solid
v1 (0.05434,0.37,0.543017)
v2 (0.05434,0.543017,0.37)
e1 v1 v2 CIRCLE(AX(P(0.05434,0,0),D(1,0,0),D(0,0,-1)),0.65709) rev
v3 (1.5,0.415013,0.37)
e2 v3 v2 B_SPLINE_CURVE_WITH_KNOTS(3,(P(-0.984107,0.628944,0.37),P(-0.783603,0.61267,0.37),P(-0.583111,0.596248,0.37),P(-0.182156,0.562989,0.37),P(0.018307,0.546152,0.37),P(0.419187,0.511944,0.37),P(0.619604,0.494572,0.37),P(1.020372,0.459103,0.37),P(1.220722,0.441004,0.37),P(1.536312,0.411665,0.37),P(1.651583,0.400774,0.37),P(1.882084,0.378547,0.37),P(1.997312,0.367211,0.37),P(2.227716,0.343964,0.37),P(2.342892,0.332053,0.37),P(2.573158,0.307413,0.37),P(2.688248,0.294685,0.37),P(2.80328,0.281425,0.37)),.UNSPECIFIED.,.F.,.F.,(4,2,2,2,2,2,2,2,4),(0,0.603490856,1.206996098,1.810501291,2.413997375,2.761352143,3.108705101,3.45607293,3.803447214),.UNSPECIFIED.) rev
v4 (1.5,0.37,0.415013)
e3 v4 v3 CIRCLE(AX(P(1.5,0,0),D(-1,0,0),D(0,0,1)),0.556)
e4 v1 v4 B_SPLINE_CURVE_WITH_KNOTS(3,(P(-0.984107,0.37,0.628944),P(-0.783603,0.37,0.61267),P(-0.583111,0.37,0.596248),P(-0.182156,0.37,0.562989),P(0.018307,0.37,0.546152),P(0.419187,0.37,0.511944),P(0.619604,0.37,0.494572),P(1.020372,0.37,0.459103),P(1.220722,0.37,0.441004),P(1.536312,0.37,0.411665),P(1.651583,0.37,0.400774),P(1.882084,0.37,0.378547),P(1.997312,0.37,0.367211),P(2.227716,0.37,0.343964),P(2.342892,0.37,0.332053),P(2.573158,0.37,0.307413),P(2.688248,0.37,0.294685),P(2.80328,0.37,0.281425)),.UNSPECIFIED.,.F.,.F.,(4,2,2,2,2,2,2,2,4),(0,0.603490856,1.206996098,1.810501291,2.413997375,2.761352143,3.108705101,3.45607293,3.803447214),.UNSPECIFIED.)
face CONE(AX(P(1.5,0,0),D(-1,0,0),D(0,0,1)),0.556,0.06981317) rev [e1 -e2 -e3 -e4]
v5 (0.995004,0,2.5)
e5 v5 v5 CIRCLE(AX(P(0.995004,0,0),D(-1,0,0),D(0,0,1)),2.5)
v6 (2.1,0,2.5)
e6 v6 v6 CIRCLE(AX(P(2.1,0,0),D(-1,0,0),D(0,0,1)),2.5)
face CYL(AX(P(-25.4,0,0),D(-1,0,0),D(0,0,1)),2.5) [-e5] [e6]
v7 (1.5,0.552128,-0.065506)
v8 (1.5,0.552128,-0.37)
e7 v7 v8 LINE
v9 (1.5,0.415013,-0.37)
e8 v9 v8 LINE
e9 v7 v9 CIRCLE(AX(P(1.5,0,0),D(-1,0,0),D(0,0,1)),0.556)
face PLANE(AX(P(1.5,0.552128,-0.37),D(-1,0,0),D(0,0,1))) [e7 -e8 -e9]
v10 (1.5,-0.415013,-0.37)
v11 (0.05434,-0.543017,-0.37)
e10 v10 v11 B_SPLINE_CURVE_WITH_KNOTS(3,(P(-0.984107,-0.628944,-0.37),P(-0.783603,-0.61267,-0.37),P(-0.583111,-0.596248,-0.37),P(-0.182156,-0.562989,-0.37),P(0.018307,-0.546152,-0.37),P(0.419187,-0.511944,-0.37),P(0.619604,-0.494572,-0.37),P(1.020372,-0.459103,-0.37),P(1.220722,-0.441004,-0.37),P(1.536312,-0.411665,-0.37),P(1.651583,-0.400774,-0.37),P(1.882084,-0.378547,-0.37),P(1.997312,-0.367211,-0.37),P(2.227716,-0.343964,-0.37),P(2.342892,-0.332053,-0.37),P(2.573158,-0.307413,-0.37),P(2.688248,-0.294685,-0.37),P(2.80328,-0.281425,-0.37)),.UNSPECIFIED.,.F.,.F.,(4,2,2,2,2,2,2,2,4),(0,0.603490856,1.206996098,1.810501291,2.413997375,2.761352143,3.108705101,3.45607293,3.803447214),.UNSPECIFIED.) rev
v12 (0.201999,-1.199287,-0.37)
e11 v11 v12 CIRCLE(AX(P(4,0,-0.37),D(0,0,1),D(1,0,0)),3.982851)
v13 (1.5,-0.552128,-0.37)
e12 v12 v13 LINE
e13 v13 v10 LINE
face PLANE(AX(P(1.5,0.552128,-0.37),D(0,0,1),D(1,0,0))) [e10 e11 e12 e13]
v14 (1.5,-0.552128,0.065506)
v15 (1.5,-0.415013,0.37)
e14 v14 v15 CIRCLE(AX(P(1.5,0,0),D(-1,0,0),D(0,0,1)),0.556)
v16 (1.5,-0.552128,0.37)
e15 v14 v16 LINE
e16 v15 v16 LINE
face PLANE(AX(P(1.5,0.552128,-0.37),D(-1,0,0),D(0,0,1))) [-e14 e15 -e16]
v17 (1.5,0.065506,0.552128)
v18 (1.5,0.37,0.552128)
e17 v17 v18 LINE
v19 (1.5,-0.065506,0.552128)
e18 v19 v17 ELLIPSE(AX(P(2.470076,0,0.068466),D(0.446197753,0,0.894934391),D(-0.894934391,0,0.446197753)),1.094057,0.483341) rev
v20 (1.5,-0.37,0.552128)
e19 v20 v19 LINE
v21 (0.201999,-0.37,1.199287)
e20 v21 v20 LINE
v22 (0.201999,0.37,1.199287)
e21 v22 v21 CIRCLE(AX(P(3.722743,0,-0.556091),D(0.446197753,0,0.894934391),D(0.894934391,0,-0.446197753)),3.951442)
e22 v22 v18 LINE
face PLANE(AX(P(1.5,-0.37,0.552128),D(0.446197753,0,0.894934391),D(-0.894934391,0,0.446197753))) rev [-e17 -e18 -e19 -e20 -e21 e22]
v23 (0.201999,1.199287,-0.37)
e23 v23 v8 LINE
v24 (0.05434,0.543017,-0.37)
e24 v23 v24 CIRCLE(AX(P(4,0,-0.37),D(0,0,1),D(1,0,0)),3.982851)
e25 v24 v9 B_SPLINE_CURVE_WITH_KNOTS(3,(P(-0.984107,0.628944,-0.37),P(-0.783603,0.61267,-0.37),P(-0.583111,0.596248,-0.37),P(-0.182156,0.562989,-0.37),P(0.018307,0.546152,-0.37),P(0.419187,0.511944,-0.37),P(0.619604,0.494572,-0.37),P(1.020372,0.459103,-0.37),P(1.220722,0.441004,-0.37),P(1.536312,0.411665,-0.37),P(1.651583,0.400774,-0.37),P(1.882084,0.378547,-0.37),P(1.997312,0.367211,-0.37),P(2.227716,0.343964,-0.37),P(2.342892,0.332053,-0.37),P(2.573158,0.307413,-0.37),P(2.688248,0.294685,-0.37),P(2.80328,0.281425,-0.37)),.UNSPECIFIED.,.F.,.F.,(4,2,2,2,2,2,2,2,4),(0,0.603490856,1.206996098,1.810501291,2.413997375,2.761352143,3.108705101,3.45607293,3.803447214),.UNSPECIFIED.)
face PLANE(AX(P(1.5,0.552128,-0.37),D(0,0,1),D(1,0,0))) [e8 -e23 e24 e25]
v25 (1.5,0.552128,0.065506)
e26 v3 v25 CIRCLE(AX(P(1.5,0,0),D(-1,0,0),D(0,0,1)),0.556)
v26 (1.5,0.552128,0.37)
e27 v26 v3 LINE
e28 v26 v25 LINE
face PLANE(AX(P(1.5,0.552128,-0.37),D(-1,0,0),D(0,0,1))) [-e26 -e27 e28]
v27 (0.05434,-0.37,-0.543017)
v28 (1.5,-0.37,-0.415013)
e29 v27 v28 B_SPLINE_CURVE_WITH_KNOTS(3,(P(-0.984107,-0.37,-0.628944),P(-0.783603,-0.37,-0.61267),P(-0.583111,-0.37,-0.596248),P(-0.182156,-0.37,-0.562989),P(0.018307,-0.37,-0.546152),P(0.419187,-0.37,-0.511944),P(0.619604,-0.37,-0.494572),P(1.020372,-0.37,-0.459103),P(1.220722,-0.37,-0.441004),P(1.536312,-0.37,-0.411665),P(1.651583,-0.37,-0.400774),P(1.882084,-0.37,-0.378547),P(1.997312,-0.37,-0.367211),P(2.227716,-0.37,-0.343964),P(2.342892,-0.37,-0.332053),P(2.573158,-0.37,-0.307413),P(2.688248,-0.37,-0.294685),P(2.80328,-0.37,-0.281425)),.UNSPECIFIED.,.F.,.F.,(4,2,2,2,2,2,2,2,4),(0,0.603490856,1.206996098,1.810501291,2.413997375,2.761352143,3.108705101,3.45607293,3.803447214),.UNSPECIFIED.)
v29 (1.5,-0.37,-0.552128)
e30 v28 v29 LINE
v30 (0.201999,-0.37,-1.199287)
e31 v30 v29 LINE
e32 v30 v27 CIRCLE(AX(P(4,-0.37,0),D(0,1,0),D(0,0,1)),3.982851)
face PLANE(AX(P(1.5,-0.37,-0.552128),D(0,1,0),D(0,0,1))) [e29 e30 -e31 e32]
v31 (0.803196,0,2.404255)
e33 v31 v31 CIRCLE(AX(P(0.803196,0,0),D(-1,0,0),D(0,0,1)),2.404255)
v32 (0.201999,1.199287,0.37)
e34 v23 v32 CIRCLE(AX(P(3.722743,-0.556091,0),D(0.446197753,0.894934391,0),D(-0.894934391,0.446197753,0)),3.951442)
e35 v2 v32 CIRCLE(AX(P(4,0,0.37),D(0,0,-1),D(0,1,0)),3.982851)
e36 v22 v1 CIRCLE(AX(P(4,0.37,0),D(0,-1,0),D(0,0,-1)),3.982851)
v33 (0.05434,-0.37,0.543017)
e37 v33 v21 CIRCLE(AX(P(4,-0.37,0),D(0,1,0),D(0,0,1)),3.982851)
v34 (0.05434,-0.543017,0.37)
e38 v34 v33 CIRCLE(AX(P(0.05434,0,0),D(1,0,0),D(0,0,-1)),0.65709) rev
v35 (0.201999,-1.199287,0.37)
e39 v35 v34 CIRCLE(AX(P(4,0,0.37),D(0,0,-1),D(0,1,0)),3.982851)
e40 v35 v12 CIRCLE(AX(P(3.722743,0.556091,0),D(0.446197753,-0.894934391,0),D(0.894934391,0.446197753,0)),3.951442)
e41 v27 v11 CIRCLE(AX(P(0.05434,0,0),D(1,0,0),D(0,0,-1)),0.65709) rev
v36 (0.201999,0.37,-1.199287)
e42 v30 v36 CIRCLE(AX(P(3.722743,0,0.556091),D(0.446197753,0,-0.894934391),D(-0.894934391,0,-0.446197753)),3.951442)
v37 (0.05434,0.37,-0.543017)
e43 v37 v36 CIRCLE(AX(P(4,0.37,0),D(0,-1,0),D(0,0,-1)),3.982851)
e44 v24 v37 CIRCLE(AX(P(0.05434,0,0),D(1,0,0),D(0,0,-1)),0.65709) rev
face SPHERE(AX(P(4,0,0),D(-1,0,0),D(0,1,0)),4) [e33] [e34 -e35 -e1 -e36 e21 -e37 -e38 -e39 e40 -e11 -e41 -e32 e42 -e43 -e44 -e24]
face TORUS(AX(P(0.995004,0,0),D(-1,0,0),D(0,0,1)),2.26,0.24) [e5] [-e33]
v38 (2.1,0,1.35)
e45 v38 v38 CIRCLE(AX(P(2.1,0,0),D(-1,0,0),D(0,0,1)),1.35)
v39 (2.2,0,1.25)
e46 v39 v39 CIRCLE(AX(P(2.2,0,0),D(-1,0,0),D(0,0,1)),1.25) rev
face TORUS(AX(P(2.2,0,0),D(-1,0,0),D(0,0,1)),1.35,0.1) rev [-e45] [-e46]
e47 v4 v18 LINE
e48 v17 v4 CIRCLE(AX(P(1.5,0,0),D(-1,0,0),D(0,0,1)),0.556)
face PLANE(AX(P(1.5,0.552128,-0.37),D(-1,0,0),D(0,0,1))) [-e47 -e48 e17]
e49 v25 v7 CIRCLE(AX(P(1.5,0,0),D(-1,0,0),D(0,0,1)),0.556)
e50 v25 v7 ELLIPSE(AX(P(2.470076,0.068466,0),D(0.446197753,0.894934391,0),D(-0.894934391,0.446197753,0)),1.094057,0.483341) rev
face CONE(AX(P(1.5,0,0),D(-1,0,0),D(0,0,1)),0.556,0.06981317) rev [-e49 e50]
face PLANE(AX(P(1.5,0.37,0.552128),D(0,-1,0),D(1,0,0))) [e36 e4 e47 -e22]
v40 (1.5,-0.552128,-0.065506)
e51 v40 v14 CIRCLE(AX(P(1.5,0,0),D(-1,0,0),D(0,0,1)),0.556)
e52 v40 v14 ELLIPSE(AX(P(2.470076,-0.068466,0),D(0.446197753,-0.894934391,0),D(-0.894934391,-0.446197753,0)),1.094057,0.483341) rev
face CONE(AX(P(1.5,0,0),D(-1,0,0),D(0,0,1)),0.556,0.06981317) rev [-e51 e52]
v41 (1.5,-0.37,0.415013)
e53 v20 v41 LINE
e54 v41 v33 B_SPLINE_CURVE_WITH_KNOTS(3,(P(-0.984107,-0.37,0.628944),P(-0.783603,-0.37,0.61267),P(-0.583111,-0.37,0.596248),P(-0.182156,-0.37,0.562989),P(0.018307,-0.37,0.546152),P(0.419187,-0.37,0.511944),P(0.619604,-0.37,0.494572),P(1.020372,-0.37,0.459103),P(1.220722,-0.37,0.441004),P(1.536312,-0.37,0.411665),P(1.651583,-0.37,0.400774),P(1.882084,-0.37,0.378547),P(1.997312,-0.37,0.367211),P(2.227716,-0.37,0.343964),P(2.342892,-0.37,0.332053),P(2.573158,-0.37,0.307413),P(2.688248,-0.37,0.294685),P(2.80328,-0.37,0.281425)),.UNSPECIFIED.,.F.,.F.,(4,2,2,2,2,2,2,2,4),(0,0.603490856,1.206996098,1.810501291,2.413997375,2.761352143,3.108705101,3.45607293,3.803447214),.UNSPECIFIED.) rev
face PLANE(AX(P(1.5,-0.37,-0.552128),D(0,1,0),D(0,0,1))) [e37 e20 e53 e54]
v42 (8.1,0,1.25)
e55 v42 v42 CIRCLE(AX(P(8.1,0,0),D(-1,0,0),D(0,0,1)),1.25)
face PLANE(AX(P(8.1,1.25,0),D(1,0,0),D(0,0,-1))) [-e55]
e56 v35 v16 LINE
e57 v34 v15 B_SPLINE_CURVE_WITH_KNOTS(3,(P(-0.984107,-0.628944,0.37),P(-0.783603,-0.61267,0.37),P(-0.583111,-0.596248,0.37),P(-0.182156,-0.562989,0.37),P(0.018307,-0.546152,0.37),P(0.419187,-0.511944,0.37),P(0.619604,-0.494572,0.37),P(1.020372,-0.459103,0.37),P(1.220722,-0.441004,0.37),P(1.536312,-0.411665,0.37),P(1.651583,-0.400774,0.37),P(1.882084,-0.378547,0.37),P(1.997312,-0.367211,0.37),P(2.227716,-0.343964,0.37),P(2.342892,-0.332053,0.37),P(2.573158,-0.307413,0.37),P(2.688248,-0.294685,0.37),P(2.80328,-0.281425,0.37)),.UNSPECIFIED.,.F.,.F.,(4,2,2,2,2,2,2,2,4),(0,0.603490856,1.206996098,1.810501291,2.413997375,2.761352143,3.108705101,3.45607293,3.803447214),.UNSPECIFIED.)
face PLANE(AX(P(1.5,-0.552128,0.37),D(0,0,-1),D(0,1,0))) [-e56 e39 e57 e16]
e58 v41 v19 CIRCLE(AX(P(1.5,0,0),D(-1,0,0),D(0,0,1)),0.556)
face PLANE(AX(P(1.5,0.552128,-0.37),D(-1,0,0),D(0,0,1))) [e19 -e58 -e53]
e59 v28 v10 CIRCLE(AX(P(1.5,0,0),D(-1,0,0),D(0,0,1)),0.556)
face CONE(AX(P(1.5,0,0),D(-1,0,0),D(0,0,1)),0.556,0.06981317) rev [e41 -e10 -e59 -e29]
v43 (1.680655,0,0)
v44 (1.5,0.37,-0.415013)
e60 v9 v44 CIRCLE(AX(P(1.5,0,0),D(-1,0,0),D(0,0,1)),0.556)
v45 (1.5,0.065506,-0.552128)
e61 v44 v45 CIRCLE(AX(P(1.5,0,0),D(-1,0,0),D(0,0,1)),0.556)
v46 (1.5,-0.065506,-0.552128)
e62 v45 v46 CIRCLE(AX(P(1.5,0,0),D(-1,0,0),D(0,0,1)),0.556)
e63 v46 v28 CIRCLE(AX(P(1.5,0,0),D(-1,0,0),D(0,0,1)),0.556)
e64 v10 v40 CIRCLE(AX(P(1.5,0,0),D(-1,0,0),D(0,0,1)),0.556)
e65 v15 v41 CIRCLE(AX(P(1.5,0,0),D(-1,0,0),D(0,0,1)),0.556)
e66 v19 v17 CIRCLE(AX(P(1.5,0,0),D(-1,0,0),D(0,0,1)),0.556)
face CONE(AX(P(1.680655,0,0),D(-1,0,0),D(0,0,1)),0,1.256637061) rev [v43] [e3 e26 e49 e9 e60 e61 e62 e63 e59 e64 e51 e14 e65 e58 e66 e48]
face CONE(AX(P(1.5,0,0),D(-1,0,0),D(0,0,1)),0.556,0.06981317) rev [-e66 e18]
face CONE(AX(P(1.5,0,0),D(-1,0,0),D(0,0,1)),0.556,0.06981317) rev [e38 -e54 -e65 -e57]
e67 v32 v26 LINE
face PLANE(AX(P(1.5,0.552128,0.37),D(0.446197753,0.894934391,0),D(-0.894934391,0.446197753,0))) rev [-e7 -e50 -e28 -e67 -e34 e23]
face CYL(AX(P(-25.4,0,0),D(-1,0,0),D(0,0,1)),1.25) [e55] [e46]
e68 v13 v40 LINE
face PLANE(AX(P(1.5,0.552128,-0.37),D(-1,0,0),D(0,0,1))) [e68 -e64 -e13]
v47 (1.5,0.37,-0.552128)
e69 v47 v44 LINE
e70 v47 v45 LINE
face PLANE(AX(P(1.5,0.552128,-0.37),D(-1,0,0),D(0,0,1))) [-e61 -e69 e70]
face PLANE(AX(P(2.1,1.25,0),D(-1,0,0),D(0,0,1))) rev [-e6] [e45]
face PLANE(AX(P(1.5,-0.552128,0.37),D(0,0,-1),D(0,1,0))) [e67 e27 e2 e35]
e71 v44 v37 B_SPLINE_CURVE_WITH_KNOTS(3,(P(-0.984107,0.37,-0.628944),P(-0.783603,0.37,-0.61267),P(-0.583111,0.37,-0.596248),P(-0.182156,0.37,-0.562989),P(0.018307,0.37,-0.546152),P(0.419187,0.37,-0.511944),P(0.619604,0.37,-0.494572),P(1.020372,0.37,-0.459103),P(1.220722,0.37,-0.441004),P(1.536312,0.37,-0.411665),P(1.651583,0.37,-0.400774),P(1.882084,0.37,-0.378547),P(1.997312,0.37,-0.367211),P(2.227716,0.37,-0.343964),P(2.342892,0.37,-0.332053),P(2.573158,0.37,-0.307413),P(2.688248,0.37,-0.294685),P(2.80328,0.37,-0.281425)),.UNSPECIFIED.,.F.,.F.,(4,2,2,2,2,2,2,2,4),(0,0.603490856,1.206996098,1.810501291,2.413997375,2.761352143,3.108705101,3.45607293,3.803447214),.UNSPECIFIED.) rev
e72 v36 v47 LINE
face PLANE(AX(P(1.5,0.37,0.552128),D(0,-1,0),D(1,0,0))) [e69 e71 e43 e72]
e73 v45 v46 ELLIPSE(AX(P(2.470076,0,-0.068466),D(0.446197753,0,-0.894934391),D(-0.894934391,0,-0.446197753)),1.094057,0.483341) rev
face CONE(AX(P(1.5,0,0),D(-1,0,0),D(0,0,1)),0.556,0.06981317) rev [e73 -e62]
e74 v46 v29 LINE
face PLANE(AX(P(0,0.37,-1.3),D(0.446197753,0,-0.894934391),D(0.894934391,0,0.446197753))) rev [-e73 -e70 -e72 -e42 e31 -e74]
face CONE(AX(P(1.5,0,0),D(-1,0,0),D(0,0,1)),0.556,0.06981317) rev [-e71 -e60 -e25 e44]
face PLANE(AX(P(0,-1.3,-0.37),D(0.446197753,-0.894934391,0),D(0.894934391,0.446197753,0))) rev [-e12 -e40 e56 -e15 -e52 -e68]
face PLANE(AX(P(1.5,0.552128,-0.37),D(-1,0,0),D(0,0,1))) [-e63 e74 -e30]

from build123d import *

# Parameters (mm, degrees)
RECPAT_COUNT = 2
RECPAT_ANGLE = 90


with BuildPart() as part:
    # Fillet1: read off the stored shape, not the designer's step
    # Fillet1 outline → Fillet1 (revolve)
    with BuildSketch(Plane.YX):
        with BuildLine():
            Line((1.25, 2.2), (1.25, 8.1))
            Line((1.25, 8.1), (0, 8.1))
            Line((0, 8.1), (0, 0))
            ThreePointArc((0, 0), (1.267435139, 0.206109099), (2.404255321, 0.803195916))
            ThreePointArc((2.404255321, 0.803195916), (2.474733878, 0.88781572), (2.5, 0.99500416))
            Line((2.5, 0.99500416), (2.5, 2.1))
            Line((2.5, 2.1), (1.35, 2.1))
            ThreePointArc((1.35, 2.1), (1.279289322, 2.129289322), (1.25, 2.2))
        make_face()
    revolve(axis=Axis((0, 0, 0), (1, 0, 0)))

    # Sketch3 → Recess section 0
    with BuildSketch(Plane(origin=(0, 0, 0), x_dir=(0, 0, -1), z_dir=(1, 0, 0))):
        with BuildLine():
            Line((0.37, -1.3), (-0.37, -1.3))
            Line((-0.37, -1.3), (-0.37, 1.3))
            Line((-0.37, 1.3), (0.37, 1.3))
            Line((0.37, 1.3), (0.37, -1.3))
        make_face()
    # Sketch4 → Recess section 1
    with BuildSketch(Plane(origin=(1.5, 0, 0), x_dir=(0, 0, -1), z_dir=(1, 0, 0))):
        with BuildLine():
            Line((0.37, -0.552127713), (-0.37, -0.552127713))
            Line((-0.37, -0.552127713), (-0.37, 0.552127713))
            Line((-0.37, 0.552127713), (0.37, 0.552127713))
            Line((0.37, 0.552127713), (0.37, -0.552127713))
        make_face()
    recess = loft(mode=Mode.SUBTRACT)

    # RecPat: Recess ×2 about axis
    recpat_axis = Axis((0, 0, 0), (1, 0, 0))
    for i in range(1, RECPAT_COUNT):
        add(recess.rotate(recpat_axis, i * RECPAT_ANGLE / (RECPAT_COUNT - 1)), mode=Mode.SUBTRACT)

    # RecCorSke → RecessCore (revolve, cut)
    with BuildSketch(Plane.XY, mode=Mode.PRIVATE) as recesscore_sk:
        Polygon((0, 0), (0, 0.660890218), (1.5, 0.556), (1.680655351, 0), align=None)
    revolve(recesscore_sk.sketch.rotate(Axis((-3.175, 0, 0), (1, 0, 0)), 90), axis=Axis((-3.175, 0, 0), (1, 0, 0)), mode=Mode.SUBTRACT)


solid = part.part
